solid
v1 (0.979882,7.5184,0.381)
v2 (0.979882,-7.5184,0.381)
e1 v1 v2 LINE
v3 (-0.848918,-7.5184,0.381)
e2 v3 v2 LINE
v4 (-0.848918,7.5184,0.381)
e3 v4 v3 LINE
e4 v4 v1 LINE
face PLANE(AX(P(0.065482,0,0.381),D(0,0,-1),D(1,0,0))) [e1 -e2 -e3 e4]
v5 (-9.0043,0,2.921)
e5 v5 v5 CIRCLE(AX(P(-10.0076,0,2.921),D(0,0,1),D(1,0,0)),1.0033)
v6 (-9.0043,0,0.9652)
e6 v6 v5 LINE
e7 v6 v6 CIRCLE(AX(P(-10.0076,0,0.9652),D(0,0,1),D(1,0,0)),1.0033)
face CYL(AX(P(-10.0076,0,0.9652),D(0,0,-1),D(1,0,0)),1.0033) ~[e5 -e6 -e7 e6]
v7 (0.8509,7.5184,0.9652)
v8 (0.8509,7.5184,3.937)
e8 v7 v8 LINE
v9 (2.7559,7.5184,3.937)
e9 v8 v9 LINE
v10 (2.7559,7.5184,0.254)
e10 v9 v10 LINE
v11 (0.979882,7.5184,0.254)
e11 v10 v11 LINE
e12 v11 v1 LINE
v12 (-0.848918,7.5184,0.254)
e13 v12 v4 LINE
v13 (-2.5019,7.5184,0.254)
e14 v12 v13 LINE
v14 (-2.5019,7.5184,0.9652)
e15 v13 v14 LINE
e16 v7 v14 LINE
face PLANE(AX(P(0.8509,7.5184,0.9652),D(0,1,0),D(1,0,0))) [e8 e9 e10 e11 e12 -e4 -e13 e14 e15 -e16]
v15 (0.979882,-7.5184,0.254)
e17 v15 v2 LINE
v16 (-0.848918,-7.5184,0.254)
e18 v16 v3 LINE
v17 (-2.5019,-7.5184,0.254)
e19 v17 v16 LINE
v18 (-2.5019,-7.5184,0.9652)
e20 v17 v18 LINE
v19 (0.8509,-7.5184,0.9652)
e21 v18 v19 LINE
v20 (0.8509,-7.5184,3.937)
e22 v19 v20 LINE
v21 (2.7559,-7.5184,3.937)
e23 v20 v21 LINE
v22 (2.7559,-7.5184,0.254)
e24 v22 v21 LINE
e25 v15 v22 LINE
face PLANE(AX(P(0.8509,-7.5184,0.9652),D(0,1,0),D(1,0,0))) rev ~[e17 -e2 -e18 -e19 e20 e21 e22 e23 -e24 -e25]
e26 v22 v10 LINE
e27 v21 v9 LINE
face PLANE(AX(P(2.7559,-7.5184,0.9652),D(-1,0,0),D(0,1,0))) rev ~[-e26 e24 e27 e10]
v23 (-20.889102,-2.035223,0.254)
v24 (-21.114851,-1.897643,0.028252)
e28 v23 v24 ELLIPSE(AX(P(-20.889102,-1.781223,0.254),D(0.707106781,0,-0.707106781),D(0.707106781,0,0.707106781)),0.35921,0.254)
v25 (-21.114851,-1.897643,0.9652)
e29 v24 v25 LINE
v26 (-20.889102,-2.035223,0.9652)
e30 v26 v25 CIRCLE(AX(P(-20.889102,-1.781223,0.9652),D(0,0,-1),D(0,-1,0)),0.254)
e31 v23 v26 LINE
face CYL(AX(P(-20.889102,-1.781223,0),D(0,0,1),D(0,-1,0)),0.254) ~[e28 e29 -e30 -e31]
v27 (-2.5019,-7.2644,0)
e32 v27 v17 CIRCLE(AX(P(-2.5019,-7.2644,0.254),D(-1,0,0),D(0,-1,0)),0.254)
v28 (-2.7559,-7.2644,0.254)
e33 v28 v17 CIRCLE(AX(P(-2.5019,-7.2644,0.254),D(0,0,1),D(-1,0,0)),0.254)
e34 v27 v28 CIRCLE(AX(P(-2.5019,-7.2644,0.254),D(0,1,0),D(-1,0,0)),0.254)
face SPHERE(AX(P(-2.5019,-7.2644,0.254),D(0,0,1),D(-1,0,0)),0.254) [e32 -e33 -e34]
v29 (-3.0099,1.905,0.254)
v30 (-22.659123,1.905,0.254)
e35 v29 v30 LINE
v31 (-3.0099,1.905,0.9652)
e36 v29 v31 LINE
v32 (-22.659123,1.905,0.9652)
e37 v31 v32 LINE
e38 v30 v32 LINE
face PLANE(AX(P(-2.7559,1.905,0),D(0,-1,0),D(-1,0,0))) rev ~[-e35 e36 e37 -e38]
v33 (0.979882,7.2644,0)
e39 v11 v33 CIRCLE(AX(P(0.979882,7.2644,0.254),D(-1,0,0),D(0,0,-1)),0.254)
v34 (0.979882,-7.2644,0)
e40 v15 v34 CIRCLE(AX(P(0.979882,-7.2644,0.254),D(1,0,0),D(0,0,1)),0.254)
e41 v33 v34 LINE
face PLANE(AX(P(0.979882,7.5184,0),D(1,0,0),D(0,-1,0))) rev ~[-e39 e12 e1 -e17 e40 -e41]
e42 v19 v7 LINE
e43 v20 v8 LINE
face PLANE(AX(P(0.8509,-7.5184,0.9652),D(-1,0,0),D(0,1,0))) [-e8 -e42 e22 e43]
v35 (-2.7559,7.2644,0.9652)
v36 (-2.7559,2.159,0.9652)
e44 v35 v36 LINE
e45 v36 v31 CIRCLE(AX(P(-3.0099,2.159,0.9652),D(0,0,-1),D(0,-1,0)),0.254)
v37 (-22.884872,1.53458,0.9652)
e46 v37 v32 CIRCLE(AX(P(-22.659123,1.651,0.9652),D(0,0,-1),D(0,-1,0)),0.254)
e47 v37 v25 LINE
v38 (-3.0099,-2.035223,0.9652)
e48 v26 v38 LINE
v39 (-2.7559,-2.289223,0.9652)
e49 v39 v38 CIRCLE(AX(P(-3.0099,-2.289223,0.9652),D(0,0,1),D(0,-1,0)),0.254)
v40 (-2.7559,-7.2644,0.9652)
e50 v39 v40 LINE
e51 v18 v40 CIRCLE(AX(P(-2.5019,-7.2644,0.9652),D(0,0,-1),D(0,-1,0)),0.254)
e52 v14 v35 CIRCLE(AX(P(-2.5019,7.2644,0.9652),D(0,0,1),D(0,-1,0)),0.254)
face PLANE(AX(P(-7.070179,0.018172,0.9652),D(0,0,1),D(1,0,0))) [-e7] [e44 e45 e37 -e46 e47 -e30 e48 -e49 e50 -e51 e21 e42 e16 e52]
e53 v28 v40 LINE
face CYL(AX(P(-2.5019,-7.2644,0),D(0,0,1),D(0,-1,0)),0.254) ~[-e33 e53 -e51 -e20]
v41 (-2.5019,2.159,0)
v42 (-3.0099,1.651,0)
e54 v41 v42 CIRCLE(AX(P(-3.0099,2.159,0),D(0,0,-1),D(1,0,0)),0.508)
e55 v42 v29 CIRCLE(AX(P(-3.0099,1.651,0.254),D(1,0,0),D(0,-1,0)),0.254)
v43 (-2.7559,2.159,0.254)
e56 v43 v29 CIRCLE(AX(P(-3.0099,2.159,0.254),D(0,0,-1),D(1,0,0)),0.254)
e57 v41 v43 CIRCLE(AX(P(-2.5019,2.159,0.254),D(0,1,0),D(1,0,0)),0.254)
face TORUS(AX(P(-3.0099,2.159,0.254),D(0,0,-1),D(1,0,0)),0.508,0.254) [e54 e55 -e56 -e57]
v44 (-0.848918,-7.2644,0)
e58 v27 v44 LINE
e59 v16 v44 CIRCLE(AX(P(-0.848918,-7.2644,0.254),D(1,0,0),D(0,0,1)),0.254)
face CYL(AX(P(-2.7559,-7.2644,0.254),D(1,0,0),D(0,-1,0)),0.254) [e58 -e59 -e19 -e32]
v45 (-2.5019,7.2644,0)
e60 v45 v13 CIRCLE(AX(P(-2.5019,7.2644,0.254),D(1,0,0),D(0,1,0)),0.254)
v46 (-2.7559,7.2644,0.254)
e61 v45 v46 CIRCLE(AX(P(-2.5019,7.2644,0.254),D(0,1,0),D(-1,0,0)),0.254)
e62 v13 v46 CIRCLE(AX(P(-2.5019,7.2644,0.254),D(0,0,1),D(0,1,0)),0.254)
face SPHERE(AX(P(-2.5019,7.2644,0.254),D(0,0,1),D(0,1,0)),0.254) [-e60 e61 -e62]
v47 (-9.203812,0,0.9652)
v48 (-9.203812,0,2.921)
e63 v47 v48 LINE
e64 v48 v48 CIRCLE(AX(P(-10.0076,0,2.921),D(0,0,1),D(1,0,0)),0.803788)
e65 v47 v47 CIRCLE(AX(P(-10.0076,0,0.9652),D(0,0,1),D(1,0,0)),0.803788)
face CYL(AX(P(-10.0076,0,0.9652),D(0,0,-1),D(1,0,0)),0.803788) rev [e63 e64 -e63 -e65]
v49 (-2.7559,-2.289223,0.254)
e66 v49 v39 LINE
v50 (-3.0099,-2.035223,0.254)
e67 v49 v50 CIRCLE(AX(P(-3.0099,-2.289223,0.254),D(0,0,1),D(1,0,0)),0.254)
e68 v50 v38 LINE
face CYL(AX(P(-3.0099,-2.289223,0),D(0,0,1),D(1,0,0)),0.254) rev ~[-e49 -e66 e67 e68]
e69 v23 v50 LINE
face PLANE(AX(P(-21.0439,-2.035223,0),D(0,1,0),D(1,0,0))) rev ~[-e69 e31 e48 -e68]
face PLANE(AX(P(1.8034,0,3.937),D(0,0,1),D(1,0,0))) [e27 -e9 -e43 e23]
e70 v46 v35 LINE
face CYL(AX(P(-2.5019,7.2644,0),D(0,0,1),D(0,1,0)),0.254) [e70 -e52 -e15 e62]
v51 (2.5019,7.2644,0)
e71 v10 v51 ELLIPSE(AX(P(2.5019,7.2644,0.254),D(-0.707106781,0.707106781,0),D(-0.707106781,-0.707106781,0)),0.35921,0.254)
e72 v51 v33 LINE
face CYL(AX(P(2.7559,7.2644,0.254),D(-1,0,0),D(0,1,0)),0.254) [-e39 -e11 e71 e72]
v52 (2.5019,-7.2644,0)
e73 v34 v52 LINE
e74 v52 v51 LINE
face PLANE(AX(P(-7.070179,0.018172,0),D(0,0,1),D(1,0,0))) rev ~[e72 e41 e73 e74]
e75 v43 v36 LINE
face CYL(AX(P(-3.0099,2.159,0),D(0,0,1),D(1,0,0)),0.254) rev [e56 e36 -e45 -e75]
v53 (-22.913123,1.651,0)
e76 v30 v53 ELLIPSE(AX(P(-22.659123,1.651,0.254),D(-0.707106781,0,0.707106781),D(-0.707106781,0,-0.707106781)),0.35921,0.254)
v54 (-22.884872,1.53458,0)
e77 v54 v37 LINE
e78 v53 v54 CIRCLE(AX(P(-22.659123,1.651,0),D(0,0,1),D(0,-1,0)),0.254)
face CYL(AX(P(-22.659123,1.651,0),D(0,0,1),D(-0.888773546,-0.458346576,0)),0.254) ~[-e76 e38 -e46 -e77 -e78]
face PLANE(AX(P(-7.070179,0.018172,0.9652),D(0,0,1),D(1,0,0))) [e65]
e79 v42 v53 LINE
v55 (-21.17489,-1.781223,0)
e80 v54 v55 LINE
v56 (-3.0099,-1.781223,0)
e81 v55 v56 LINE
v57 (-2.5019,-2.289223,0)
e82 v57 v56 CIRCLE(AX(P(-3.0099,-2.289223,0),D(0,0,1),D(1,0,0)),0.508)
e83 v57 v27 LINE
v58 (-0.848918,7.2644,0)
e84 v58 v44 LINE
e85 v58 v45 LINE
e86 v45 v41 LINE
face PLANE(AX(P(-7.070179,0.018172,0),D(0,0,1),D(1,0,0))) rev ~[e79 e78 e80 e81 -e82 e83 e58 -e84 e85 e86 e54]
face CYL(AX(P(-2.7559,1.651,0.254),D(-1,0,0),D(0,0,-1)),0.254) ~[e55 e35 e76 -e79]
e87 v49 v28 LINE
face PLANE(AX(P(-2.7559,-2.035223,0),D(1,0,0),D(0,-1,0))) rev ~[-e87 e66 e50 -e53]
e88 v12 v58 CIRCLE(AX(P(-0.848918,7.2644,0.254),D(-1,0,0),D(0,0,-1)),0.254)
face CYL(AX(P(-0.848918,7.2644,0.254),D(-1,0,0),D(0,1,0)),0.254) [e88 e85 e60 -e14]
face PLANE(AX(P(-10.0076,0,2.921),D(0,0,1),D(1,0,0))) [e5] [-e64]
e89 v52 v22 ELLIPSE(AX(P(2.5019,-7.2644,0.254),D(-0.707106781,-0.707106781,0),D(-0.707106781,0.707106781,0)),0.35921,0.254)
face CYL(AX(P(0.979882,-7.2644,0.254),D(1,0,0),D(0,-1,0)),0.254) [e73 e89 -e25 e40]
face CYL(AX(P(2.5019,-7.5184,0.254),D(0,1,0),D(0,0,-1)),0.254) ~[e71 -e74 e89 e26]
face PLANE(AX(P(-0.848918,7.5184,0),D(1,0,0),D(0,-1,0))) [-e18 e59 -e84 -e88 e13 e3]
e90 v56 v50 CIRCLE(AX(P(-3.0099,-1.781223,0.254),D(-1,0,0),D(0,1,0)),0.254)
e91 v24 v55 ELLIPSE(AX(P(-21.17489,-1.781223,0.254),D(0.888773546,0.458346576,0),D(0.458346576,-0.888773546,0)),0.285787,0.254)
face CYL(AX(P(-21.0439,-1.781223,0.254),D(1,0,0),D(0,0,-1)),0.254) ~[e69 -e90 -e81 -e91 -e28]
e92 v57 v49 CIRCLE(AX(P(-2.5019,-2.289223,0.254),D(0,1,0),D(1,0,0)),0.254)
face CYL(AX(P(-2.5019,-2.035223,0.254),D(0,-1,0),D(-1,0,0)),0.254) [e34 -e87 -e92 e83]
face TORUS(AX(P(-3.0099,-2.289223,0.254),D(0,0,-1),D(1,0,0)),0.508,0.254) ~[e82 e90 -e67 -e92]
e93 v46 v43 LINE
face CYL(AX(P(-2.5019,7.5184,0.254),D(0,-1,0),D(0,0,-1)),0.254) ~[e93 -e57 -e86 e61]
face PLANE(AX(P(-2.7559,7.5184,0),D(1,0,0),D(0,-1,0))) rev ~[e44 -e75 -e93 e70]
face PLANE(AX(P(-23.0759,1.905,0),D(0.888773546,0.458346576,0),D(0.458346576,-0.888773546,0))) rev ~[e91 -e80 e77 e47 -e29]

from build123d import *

# Parameters (mm, degrees)
F1_DEPTH = 0.9652
F2_W     = 1.905
F2_H     = 15.0368
F3_DEPTH = 2.9718
F2_R     = 1.0033
F2_R_2   = 0.8037883442
F4_DEPTH = 1.9558
F5_W     = 1.8288
F5_H     = 15.0368
F6_DEPTH = 0.381
F7_R     = 0.254


with BuildPart() as f1:
    # F0 (on Top) → F1 (new body)
    with BuildSketch(Plane.XY):
        Polygon((-2.7559, -7.5184), (2.7559, -7.5184), (2.7559, 7.5184), (0.8509, 7.5184), (-2.7559, 7.5184), (-2.7559, 1.905), (-23.0759, 1.905), (-21.0439, -2.035223273), (-2.7559, -2.035223273), align=None)
    extrude(amount=F1_DEPTH)

    # F2 (on face) → F3 (join)
    with BuildSketch(Plane.XY.offset(0.9652)):
        with Locations((1.8034, 0)):
            Rectangle(F2_W, F2_H)
    extrude(amount=F3_DEPTH)

    # F2 (on face) → F4 (join)
    with BuildSketch(Plane.XY.offset(0.9652)):
        with Locations((-10.0076, 0)):
            Circle(F2_R)
        with Locations((-10.0076, 0)):
            Circle(F2_R_2, mode=Mode.SUBTRACT)
    extrude(amount=F4_DEPTH)

    # F5 (on face) → F6 (cut)
    with BuildSketch(Plane(origin=(0, 0, 0), x_dir=(1, 0, 0), z_dir=(0, 0, -1))):
        with Locations((0.0654817199, 0)):
            Rectangle(F5_W, F5_H)
    extrude(amount=-F6_DEPTH, mode=Mode.SUBTRACT)

    # F7
    f7_edges = [f1.edges().sort_by_distance(p)[0] for p in [
        (-23.0759, 1.905, 0.4826),
        (-21.0439, -2.035223, 0.4826),
        (-2.7559, -7.5184, 0.4826),
        (-2.7559, 7.5184, 0.4826),
        (-2.7559, -2.035223, 0.4826),
        (-2.7559, 1.905, 0.4826),
        (-1.802409, 7.5184, 0),
        (1.867891, 7.5184, 0),
        (2.7559, 0, 0),
        (-2.7559, 4.7117, 0),
        (-2.7559, -4.776812, 0),
        (-1.802409, -7.5184, 0),
        (1.867891, -7.5184, 0),
        (-11.8999, -2.035223, 0),
        (-12.9159, 1.905, 0),
    ]]
    fillet(f7_edges, radius=F7_R)


solid = f1.part
